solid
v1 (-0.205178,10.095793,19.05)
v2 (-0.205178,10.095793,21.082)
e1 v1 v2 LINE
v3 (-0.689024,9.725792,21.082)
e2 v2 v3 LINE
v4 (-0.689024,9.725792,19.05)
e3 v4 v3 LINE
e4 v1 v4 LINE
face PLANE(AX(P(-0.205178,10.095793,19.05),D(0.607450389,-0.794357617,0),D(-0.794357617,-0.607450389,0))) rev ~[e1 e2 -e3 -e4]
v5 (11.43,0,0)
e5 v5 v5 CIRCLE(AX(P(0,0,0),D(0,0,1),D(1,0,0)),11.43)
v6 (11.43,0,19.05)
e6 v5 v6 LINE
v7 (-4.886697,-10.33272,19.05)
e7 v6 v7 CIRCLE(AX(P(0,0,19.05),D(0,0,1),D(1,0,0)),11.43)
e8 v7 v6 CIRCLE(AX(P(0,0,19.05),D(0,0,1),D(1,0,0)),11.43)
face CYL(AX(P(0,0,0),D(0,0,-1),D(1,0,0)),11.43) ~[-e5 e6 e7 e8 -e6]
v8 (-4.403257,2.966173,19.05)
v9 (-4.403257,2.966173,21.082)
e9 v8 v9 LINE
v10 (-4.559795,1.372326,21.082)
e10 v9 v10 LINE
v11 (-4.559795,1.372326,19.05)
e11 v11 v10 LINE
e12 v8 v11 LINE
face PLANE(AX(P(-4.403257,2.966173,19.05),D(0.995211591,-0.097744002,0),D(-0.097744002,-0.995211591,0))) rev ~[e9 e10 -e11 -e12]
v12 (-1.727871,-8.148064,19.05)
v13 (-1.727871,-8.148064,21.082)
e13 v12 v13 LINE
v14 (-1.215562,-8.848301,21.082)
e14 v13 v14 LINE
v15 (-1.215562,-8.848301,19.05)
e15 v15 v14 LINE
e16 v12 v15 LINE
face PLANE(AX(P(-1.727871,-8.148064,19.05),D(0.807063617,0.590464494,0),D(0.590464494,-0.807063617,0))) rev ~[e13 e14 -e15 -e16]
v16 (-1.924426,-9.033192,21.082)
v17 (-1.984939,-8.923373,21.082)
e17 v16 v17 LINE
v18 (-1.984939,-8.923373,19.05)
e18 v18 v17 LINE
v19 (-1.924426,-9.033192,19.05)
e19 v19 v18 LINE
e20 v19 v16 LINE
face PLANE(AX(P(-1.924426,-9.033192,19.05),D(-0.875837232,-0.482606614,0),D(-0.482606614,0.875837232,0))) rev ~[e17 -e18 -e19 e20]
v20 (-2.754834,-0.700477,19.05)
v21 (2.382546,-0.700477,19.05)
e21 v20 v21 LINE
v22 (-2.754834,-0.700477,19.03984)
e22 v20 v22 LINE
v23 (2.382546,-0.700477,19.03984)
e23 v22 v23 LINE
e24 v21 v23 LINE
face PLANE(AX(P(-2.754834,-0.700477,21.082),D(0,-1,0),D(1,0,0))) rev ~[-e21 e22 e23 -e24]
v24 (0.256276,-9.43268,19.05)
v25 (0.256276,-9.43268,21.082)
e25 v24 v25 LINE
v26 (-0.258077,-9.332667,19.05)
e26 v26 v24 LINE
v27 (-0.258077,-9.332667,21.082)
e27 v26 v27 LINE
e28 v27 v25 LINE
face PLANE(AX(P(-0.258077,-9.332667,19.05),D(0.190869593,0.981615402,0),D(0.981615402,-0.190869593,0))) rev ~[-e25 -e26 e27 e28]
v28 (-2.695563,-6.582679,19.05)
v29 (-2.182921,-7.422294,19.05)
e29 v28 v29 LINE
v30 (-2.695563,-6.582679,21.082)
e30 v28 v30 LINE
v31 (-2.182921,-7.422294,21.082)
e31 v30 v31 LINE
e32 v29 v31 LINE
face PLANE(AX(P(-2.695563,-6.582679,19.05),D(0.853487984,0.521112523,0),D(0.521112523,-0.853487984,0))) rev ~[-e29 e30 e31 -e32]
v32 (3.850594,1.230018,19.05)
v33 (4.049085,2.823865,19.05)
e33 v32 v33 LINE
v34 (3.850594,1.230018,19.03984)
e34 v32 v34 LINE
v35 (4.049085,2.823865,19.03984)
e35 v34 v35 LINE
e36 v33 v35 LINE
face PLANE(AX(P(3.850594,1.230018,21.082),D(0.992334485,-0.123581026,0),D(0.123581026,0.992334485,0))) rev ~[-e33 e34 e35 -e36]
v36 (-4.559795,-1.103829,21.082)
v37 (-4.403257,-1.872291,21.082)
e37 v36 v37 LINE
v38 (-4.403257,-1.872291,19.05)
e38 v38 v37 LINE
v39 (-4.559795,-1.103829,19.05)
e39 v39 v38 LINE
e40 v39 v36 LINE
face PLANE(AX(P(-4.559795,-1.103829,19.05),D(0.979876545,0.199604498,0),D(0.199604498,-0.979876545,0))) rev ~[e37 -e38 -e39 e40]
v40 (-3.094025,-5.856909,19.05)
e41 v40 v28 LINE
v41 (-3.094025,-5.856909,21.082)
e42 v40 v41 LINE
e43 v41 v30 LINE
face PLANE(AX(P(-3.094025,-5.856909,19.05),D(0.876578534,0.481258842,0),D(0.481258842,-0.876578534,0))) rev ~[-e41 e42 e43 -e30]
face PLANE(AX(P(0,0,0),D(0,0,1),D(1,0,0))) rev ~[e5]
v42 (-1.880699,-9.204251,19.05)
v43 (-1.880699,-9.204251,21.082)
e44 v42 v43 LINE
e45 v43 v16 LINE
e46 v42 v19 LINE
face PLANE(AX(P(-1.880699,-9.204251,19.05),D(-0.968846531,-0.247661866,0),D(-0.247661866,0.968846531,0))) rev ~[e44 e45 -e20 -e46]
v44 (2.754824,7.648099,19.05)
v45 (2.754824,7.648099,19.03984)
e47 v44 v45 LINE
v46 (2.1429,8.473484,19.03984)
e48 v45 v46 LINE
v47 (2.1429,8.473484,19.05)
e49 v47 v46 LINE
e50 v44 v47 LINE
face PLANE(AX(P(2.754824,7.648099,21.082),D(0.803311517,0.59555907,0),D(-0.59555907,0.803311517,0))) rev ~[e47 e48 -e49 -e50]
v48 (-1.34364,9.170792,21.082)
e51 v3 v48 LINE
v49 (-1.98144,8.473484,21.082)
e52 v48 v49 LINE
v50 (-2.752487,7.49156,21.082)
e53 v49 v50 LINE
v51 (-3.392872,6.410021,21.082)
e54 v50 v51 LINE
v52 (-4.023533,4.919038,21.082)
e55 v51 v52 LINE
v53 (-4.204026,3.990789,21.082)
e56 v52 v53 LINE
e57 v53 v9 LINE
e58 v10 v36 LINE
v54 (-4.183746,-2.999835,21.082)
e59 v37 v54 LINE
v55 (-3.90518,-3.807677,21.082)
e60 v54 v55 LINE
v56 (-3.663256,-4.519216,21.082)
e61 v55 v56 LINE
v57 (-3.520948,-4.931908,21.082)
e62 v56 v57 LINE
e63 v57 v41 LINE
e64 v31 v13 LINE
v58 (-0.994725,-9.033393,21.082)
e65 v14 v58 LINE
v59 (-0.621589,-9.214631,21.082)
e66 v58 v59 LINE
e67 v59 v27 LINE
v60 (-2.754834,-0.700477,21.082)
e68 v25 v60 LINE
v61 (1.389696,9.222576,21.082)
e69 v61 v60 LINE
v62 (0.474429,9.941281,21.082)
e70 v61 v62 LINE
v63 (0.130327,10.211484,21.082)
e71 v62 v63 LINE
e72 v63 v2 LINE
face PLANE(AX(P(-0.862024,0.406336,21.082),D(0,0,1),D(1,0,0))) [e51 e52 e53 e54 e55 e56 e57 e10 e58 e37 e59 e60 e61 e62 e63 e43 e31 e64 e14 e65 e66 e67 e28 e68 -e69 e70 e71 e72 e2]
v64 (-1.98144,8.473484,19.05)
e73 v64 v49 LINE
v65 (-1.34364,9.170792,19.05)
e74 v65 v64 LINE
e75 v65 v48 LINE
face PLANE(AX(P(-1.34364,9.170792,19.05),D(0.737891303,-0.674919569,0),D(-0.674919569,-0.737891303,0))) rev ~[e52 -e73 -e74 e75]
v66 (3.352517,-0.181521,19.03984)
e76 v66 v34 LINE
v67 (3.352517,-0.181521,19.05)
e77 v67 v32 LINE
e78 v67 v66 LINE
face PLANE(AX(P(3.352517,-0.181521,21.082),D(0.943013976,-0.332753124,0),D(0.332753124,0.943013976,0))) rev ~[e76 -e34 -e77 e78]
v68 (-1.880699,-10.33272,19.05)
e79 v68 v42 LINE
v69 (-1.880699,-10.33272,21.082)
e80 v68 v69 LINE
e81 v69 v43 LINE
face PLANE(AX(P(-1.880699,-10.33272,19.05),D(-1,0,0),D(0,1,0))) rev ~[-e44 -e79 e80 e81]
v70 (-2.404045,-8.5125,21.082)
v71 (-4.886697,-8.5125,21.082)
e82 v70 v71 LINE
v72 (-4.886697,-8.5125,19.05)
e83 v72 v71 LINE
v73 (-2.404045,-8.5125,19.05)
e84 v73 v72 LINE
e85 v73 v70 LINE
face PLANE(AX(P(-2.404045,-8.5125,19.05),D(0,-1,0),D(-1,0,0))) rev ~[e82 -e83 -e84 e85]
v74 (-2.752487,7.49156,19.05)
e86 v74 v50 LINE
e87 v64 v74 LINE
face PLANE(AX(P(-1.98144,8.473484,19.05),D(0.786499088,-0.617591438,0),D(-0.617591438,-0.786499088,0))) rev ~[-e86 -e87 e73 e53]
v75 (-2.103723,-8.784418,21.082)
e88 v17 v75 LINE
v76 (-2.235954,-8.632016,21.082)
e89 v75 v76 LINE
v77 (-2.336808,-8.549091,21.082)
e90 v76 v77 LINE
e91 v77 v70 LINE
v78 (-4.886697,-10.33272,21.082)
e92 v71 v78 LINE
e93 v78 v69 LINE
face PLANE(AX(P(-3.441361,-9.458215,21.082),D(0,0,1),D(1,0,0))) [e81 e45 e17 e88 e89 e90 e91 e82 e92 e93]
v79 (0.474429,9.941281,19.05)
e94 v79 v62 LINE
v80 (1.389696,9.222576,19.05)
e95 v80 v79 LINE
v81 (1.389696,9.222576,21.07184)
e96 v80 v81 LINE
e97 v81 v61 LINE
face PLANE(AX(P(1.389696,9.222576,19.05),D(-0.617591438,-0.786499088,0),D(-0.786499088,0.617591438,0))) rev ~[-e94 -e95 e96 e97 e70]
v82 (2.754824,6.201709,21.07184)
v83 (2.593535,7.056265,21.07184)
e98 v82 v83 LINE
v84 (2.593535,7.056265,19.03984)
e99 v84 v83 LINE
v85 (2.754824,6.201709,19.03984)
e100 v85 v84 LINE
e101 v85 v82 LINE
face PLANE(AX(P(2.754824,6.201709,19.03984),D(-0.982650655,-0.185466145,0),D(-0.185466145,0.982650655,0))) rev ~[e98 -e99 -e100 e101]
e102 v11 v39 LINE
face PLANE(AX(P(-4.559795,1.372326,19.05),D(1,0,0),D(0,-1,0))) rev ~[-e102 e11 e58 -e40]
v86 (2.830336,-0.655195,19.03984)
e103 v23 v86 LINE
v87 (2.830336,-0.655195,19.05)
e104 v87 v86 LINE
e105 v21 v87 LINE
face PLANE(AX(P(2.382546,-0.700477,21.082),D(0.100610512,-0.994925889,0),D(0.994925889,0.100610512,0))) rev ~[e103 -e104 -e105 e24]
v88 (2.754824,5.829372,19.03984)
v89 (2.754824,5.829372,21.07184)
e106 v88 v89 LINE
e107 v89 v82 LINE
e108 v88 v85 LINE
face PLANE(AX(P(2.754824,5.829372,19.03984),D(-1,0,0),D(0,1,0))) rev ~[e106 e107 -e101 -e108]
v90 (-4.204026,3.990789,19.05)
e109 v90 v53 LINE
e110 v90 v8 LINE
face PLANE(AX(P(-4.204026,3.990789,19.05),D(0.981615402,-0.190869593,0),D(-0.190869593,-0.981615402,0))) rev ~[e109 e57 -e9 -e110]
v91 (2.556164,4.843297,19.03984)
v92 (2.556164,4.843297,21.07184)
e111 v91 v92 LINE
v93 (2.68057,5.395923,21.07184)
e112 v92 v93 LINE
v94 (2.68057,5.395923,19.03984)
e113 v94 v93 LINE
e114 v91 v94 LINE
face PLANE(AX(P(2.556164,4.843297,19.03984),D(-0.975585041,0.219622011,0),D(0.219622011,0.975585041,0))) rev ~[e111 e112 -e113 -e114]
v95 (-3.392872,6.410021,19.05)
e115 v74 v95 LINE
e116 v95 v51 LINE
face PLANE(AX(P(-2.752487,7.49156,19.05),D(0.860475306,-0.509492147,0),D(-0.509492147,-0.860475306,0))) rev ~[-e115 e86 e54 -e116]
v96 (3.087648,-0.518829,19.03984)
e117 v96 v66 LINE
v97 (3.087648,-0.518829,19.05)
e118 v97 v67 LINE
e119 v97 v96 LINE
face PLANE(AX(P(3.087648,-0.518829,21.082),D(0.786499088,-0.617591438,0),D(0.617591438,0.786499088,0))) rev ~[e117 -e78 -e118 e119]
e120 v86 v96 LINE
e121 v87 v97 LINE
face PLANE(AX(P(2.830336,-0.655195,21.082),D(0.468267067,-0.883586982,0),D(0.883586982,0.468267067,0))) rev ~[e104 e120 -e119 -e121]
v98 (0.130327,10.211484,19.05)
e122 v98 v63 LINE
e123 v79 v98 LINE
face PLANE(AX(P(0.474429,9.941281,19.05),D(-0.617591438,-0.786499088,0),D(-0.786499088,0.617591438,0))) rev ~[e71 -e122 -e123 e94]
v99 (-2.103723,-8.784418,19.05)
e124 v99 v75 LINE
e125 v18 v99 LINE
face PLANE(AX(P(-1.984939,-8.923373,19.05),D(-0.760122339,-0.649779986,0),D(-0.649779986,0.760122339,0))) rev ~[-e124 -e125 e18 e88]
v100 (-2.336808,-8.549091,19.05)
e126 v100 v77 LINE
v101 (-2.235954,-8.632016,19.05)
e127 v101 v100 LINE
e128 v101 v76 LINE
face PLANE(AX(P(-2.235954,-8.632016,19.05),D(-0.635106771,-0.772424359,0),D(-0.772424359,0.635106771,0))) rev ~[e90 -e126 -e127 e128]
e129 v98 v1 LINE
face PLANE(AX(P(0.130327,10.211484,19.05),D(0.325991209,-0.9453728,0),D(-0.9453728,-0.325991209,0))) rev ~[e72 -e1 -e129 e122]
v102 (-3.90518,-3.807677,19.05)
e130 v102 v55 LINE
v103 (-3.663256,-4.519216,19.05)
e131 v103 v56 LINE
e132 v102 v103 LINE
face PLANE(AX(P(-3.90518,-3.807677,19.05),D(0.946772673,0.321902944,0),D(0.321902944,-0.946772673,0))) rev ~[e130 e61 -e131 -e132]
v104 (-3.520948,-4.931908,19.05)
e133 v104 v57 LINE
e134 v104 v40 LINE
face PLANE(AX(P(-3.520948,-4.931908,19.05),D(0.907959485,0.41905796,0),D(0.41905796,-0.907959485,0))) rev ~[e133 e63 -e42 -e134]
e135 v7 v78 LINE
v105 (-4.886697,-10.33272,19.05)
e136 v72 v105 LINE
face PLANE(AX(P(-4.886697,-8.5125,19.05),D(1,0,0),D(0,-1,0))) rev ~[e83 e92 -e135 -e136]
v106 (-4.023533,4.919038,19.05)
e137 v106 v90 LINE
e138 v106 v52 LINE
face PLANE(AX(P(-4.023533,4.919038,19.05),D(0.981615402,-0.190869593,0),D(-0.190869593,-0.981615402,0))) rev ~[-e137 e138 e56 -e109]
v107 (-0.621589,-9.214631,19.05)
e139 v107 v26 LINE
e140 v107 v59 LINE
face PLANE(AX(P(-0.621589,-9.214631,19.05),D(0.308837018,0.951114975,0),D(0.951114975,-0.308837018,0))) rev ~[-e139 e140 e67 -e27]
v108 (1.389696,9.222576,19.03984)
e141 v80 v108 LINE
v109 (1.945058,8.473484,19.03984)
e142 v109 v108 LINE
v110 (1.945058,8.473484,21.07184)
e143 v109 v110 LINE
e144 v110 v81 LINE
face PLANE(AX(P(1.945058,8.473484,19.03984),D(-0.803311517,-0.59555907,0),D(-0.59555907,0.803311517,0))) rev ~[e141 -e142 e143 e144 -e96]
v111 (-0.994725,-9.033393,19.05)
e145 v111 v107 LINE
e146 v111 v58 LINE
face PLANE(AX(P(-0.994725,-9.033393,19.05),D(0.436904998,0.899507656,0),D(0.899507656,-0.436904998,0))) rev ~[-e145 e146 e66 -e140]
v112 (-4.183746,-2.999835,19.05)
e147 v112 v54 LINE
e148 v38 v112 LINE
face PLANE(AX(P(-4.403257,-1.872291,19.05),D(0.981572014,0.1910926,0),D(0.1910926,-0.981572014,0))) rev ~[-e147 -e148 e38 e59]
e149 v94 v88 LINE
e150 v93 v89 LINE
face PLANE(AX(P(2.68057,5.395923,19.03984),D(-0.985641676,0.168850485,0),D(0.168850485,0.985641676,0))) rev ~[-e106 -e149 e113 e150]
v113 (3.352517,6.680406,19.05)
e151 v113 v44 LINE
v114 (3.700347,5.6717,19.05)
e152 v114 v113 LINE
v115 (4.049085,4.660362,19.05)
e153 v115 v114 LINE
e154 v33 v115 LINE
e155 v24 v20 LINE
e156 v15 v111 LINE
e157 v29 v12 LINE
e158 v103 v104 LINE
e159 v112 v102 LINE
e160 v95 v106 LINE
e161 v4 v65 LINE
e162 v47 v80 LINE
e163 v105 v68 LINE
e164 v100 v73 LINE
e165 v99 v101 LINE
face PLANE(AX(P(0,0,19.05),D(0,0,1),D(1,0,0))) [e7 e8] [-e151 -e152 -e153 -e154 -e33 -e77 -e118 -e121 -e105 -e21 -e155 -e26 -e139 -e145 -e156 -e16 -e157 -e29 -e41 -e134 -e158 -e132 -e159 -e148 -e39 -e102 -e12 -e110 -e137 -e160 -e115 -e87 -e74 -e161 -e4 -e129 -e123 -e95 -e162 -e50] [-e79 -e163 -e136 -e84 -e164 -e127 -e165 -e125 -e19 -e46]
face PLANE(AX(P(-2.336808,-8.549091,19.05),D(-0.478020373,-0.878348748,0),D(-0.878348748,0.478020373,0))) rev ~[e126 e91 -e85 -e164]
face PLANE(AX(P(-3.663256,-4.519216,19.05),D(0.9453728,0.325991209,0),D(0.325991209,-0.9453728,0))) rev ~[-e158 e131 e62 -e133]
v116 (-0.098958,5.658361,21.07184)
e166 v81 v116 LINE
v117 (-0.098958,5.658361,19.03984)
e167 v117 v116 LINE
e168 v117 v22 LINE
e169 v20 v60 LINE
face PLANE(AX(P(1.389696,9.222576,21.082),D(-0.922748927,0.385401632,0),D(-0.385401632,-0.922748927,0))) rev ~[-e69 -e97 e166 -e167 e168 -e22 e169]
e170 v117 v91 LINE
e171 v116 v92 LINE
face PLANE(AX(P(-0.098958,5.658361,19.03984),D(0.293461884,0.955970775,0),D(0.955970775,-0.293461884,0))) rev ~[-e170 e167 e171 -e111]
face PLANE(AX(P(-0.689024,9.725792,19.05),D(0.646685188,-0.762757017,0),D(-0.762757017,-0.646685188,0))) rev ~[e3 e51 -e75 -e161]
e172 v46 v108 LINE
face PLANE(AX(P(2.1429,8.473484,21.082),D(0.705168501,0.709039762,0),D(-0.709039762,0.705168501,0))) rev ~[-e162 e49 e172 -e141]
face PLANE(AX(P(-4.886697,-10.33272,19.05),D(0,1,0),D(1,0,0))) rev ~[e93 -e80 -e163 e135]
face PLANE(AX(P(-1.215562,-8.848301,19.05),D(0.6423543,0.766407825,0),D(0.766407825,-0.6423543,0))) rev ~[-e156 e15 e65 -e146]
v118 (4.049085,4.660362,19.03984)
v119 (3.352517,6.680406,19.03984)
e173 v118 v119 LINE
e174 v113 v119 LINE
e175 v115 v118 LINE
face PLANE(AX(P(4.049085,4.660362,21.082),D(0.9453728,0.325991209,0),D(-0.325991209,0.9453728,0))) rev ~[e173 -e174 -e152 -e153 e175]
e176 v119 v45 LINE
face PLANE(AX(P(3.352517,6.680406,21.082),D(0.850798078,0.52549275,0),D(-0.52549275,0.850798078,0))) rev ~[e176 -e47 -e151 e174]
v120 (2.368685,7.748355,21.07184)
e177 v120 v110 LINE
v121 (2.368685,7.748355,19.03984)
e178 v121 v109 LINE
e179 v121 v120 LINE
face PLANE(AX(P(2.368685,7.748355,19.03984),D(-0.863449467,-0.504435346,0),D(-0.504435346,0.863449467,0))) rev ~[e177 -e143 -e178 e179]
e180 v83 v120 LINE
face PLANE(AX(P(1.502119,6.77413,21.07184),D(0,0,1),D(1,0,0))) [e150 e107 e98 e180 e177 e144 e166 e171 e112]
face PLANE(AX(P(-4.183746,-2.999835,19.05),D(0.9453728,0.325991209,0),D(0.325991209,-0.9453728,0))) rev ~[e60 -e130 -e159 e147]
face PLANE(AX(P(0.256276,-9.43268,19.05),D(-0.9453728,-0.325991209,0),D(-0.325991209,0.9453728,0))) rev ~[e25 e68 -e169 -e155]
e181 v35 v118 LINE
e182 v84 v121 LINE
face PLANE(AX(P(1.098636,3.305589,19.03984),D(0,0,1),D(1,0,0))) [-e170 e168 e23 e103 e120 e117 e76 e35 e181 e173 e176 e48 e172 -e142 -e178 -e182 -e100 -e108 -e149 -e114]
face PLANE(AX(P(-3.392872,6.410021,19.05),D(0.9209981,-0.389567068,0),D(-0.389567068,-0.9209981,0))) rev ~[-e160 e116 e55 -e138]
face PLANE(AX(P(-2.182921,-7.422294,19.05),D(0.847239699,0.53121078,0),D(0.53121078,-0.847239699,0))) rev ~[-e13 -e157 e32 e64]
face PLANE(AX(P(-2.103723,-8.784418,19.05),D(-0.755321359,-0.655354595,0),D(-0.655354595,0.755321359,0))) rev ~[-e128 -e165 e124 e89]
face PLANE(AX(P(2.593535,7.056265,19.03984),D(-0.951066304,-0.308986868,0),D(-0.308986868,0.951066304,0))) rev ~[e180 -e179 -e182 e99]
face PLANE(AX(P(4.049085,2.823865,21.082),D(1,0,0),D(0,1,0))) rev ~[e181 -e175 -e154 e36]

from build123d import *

# Parameters (mm, degrees)
F0_R     = 11.43
F1_DEPTH = 19.05
F4_DEPTH = 2.032
F5_DEPTH = 2.032
F7_DEPTH = 2.04216
F9_DEPTH = 2.032


# Not quite as in the source:
# - the program builds the solid bodies; features that only make, move or delete a surface that nothing else refers to are left out


with BuildPart() as f1:
    # F0 (on Top) → F1 (new body)
    with BuildSketch(Plane.XY):
        Circle(F0_R)
    extrude(amount=F1_DEPTH)

    # F2 (on face) → F4 (join)
    with BuildSketch(Plane.XY.offset(19.05)):
        Polygon((-1.880699303, -9.8758544773), (-1.880699303, -9.2042507604), (-1.9244262949, -9.0331919491), (-1.9849389791, -8.9233731851), (-2.1037228871, -8.7844179943), (-2.2359541617, -8.6320163682), (-2.3368084803, -8.5490914062), (-2.4040446151, -8.5124997422), (-4.8866966505, -8.5124997422), (-4.8866966505, -10.3327196733), (-1.880699303, -10.3327196733), align=None)
    extrude(amount=F4_DEPTH)

    # F3 (on face) → F5 (join)
    with BuildSketch(Plane.XY.offset(19.05)):
        Polygon((-1.7278705491, -8.1480639055), (-1.2155624572, -8.848301135), (-0.99472492, -9.0333931148), (-0.6215886096, -9.2146312818), (-0.2580773879, -9.3326671917), (0.2562761689, -9.4326803476), (-2.7548340149, -0.7004765794), (2.3825464305, -0.7004765794), (2.8303356376, -0.6551945116), (3.0876482706, -0.5188287272), (3.3525165636, -0.1815205032), (3.8505939301, 1.2300182134), (4.0490847188, 2.823865274), (4.0490847188, 3.8342506159), (4.0490847188, 4.6603621612), (3.7003470565, 5.6716995562), (3.3525165636, 6.6804061644), (2.7548240032, 7.6480992138), (2.1429003682, 8.4734838456), (1.3896959743, 9.2225758454), (0.4744292394, 9.9412809361), (0.1303268877, 10.2114842576), (-0.2051776682, 10.0957928225), (-0.6890241057, 9.7257923335), (-1.3436399167, 9.1707920656), (-1.9814397674, 8.4734838456), (-2.7524866164, 7.4915601872), (-3.3928717021, 6.4100213349), (-4.0235333078, 4.9190376551), (-4.2040259577, 3.9907894097), (-4.4032568112, 2.966173226), (-4.5597953722, 1.3723261654), (-4.5597953722, 0.5327102263), (-4.5597953722, -0.4492135195), (-4.5597953722, -1.1038292432), (-4.4032568112, -1.8722912064), (-4.1837464389, -2.9998348066), (-3.9051796775, -3.8076769561), (-3.6632562988, -4.519215785), (-3.5209483467, -4.9319081008), (-3.0940251891, -5.8569088578), (-2.6955632493, -6.5826787613), (-2.1829206962, -7.4222944677), align=None)
    extrude(amount=F5_DEPTH)

    # F6 (on face) → F7 (cut)
    with BuildSketch(Plane.XY.offset(21.082)):
        Polygon((1.3896959743, 9.2225758454), (-2.7548340149, -0.7004765794), (2.3825464305, -0.7004765794), (2.8303356376, -0.6551945116), (3.0876482706, -0.5188287272), (3.3525165636, -0.1815205032), (3.8505939301, 1.2300182134), (4.0490847188, 2.823865274), (4.0490847188, 4.6603621612), (3.3525165636, 6.6804061644), (2.7548240032, 7.6480992138), (2.1429003682, 8.4734838456), align=None)
    extrude(amount=-F7_DEPTH, mode=Mode.SUBTRACT)

    # F8 (on face) → F9 (join)
    with BuildSketch(Plane.XY.offset(19.03984)):
        Polygon((1.94505778, 8.4734838456), (1.3896959743, 9.2225758454), (-0.0989583414, 5.6583611201), (2.5561635848, 4.8432974145), (2.6805696543, 5.3959228098), (2.7548240032, 5.8293724433), (2.7548240032, 6.2017086893), (2.5935345329, 7.0562646724), (2.3686850909, 7.748354692), align=None)
    extrude(amount=F9_DEPTH)


solid = f1.part
